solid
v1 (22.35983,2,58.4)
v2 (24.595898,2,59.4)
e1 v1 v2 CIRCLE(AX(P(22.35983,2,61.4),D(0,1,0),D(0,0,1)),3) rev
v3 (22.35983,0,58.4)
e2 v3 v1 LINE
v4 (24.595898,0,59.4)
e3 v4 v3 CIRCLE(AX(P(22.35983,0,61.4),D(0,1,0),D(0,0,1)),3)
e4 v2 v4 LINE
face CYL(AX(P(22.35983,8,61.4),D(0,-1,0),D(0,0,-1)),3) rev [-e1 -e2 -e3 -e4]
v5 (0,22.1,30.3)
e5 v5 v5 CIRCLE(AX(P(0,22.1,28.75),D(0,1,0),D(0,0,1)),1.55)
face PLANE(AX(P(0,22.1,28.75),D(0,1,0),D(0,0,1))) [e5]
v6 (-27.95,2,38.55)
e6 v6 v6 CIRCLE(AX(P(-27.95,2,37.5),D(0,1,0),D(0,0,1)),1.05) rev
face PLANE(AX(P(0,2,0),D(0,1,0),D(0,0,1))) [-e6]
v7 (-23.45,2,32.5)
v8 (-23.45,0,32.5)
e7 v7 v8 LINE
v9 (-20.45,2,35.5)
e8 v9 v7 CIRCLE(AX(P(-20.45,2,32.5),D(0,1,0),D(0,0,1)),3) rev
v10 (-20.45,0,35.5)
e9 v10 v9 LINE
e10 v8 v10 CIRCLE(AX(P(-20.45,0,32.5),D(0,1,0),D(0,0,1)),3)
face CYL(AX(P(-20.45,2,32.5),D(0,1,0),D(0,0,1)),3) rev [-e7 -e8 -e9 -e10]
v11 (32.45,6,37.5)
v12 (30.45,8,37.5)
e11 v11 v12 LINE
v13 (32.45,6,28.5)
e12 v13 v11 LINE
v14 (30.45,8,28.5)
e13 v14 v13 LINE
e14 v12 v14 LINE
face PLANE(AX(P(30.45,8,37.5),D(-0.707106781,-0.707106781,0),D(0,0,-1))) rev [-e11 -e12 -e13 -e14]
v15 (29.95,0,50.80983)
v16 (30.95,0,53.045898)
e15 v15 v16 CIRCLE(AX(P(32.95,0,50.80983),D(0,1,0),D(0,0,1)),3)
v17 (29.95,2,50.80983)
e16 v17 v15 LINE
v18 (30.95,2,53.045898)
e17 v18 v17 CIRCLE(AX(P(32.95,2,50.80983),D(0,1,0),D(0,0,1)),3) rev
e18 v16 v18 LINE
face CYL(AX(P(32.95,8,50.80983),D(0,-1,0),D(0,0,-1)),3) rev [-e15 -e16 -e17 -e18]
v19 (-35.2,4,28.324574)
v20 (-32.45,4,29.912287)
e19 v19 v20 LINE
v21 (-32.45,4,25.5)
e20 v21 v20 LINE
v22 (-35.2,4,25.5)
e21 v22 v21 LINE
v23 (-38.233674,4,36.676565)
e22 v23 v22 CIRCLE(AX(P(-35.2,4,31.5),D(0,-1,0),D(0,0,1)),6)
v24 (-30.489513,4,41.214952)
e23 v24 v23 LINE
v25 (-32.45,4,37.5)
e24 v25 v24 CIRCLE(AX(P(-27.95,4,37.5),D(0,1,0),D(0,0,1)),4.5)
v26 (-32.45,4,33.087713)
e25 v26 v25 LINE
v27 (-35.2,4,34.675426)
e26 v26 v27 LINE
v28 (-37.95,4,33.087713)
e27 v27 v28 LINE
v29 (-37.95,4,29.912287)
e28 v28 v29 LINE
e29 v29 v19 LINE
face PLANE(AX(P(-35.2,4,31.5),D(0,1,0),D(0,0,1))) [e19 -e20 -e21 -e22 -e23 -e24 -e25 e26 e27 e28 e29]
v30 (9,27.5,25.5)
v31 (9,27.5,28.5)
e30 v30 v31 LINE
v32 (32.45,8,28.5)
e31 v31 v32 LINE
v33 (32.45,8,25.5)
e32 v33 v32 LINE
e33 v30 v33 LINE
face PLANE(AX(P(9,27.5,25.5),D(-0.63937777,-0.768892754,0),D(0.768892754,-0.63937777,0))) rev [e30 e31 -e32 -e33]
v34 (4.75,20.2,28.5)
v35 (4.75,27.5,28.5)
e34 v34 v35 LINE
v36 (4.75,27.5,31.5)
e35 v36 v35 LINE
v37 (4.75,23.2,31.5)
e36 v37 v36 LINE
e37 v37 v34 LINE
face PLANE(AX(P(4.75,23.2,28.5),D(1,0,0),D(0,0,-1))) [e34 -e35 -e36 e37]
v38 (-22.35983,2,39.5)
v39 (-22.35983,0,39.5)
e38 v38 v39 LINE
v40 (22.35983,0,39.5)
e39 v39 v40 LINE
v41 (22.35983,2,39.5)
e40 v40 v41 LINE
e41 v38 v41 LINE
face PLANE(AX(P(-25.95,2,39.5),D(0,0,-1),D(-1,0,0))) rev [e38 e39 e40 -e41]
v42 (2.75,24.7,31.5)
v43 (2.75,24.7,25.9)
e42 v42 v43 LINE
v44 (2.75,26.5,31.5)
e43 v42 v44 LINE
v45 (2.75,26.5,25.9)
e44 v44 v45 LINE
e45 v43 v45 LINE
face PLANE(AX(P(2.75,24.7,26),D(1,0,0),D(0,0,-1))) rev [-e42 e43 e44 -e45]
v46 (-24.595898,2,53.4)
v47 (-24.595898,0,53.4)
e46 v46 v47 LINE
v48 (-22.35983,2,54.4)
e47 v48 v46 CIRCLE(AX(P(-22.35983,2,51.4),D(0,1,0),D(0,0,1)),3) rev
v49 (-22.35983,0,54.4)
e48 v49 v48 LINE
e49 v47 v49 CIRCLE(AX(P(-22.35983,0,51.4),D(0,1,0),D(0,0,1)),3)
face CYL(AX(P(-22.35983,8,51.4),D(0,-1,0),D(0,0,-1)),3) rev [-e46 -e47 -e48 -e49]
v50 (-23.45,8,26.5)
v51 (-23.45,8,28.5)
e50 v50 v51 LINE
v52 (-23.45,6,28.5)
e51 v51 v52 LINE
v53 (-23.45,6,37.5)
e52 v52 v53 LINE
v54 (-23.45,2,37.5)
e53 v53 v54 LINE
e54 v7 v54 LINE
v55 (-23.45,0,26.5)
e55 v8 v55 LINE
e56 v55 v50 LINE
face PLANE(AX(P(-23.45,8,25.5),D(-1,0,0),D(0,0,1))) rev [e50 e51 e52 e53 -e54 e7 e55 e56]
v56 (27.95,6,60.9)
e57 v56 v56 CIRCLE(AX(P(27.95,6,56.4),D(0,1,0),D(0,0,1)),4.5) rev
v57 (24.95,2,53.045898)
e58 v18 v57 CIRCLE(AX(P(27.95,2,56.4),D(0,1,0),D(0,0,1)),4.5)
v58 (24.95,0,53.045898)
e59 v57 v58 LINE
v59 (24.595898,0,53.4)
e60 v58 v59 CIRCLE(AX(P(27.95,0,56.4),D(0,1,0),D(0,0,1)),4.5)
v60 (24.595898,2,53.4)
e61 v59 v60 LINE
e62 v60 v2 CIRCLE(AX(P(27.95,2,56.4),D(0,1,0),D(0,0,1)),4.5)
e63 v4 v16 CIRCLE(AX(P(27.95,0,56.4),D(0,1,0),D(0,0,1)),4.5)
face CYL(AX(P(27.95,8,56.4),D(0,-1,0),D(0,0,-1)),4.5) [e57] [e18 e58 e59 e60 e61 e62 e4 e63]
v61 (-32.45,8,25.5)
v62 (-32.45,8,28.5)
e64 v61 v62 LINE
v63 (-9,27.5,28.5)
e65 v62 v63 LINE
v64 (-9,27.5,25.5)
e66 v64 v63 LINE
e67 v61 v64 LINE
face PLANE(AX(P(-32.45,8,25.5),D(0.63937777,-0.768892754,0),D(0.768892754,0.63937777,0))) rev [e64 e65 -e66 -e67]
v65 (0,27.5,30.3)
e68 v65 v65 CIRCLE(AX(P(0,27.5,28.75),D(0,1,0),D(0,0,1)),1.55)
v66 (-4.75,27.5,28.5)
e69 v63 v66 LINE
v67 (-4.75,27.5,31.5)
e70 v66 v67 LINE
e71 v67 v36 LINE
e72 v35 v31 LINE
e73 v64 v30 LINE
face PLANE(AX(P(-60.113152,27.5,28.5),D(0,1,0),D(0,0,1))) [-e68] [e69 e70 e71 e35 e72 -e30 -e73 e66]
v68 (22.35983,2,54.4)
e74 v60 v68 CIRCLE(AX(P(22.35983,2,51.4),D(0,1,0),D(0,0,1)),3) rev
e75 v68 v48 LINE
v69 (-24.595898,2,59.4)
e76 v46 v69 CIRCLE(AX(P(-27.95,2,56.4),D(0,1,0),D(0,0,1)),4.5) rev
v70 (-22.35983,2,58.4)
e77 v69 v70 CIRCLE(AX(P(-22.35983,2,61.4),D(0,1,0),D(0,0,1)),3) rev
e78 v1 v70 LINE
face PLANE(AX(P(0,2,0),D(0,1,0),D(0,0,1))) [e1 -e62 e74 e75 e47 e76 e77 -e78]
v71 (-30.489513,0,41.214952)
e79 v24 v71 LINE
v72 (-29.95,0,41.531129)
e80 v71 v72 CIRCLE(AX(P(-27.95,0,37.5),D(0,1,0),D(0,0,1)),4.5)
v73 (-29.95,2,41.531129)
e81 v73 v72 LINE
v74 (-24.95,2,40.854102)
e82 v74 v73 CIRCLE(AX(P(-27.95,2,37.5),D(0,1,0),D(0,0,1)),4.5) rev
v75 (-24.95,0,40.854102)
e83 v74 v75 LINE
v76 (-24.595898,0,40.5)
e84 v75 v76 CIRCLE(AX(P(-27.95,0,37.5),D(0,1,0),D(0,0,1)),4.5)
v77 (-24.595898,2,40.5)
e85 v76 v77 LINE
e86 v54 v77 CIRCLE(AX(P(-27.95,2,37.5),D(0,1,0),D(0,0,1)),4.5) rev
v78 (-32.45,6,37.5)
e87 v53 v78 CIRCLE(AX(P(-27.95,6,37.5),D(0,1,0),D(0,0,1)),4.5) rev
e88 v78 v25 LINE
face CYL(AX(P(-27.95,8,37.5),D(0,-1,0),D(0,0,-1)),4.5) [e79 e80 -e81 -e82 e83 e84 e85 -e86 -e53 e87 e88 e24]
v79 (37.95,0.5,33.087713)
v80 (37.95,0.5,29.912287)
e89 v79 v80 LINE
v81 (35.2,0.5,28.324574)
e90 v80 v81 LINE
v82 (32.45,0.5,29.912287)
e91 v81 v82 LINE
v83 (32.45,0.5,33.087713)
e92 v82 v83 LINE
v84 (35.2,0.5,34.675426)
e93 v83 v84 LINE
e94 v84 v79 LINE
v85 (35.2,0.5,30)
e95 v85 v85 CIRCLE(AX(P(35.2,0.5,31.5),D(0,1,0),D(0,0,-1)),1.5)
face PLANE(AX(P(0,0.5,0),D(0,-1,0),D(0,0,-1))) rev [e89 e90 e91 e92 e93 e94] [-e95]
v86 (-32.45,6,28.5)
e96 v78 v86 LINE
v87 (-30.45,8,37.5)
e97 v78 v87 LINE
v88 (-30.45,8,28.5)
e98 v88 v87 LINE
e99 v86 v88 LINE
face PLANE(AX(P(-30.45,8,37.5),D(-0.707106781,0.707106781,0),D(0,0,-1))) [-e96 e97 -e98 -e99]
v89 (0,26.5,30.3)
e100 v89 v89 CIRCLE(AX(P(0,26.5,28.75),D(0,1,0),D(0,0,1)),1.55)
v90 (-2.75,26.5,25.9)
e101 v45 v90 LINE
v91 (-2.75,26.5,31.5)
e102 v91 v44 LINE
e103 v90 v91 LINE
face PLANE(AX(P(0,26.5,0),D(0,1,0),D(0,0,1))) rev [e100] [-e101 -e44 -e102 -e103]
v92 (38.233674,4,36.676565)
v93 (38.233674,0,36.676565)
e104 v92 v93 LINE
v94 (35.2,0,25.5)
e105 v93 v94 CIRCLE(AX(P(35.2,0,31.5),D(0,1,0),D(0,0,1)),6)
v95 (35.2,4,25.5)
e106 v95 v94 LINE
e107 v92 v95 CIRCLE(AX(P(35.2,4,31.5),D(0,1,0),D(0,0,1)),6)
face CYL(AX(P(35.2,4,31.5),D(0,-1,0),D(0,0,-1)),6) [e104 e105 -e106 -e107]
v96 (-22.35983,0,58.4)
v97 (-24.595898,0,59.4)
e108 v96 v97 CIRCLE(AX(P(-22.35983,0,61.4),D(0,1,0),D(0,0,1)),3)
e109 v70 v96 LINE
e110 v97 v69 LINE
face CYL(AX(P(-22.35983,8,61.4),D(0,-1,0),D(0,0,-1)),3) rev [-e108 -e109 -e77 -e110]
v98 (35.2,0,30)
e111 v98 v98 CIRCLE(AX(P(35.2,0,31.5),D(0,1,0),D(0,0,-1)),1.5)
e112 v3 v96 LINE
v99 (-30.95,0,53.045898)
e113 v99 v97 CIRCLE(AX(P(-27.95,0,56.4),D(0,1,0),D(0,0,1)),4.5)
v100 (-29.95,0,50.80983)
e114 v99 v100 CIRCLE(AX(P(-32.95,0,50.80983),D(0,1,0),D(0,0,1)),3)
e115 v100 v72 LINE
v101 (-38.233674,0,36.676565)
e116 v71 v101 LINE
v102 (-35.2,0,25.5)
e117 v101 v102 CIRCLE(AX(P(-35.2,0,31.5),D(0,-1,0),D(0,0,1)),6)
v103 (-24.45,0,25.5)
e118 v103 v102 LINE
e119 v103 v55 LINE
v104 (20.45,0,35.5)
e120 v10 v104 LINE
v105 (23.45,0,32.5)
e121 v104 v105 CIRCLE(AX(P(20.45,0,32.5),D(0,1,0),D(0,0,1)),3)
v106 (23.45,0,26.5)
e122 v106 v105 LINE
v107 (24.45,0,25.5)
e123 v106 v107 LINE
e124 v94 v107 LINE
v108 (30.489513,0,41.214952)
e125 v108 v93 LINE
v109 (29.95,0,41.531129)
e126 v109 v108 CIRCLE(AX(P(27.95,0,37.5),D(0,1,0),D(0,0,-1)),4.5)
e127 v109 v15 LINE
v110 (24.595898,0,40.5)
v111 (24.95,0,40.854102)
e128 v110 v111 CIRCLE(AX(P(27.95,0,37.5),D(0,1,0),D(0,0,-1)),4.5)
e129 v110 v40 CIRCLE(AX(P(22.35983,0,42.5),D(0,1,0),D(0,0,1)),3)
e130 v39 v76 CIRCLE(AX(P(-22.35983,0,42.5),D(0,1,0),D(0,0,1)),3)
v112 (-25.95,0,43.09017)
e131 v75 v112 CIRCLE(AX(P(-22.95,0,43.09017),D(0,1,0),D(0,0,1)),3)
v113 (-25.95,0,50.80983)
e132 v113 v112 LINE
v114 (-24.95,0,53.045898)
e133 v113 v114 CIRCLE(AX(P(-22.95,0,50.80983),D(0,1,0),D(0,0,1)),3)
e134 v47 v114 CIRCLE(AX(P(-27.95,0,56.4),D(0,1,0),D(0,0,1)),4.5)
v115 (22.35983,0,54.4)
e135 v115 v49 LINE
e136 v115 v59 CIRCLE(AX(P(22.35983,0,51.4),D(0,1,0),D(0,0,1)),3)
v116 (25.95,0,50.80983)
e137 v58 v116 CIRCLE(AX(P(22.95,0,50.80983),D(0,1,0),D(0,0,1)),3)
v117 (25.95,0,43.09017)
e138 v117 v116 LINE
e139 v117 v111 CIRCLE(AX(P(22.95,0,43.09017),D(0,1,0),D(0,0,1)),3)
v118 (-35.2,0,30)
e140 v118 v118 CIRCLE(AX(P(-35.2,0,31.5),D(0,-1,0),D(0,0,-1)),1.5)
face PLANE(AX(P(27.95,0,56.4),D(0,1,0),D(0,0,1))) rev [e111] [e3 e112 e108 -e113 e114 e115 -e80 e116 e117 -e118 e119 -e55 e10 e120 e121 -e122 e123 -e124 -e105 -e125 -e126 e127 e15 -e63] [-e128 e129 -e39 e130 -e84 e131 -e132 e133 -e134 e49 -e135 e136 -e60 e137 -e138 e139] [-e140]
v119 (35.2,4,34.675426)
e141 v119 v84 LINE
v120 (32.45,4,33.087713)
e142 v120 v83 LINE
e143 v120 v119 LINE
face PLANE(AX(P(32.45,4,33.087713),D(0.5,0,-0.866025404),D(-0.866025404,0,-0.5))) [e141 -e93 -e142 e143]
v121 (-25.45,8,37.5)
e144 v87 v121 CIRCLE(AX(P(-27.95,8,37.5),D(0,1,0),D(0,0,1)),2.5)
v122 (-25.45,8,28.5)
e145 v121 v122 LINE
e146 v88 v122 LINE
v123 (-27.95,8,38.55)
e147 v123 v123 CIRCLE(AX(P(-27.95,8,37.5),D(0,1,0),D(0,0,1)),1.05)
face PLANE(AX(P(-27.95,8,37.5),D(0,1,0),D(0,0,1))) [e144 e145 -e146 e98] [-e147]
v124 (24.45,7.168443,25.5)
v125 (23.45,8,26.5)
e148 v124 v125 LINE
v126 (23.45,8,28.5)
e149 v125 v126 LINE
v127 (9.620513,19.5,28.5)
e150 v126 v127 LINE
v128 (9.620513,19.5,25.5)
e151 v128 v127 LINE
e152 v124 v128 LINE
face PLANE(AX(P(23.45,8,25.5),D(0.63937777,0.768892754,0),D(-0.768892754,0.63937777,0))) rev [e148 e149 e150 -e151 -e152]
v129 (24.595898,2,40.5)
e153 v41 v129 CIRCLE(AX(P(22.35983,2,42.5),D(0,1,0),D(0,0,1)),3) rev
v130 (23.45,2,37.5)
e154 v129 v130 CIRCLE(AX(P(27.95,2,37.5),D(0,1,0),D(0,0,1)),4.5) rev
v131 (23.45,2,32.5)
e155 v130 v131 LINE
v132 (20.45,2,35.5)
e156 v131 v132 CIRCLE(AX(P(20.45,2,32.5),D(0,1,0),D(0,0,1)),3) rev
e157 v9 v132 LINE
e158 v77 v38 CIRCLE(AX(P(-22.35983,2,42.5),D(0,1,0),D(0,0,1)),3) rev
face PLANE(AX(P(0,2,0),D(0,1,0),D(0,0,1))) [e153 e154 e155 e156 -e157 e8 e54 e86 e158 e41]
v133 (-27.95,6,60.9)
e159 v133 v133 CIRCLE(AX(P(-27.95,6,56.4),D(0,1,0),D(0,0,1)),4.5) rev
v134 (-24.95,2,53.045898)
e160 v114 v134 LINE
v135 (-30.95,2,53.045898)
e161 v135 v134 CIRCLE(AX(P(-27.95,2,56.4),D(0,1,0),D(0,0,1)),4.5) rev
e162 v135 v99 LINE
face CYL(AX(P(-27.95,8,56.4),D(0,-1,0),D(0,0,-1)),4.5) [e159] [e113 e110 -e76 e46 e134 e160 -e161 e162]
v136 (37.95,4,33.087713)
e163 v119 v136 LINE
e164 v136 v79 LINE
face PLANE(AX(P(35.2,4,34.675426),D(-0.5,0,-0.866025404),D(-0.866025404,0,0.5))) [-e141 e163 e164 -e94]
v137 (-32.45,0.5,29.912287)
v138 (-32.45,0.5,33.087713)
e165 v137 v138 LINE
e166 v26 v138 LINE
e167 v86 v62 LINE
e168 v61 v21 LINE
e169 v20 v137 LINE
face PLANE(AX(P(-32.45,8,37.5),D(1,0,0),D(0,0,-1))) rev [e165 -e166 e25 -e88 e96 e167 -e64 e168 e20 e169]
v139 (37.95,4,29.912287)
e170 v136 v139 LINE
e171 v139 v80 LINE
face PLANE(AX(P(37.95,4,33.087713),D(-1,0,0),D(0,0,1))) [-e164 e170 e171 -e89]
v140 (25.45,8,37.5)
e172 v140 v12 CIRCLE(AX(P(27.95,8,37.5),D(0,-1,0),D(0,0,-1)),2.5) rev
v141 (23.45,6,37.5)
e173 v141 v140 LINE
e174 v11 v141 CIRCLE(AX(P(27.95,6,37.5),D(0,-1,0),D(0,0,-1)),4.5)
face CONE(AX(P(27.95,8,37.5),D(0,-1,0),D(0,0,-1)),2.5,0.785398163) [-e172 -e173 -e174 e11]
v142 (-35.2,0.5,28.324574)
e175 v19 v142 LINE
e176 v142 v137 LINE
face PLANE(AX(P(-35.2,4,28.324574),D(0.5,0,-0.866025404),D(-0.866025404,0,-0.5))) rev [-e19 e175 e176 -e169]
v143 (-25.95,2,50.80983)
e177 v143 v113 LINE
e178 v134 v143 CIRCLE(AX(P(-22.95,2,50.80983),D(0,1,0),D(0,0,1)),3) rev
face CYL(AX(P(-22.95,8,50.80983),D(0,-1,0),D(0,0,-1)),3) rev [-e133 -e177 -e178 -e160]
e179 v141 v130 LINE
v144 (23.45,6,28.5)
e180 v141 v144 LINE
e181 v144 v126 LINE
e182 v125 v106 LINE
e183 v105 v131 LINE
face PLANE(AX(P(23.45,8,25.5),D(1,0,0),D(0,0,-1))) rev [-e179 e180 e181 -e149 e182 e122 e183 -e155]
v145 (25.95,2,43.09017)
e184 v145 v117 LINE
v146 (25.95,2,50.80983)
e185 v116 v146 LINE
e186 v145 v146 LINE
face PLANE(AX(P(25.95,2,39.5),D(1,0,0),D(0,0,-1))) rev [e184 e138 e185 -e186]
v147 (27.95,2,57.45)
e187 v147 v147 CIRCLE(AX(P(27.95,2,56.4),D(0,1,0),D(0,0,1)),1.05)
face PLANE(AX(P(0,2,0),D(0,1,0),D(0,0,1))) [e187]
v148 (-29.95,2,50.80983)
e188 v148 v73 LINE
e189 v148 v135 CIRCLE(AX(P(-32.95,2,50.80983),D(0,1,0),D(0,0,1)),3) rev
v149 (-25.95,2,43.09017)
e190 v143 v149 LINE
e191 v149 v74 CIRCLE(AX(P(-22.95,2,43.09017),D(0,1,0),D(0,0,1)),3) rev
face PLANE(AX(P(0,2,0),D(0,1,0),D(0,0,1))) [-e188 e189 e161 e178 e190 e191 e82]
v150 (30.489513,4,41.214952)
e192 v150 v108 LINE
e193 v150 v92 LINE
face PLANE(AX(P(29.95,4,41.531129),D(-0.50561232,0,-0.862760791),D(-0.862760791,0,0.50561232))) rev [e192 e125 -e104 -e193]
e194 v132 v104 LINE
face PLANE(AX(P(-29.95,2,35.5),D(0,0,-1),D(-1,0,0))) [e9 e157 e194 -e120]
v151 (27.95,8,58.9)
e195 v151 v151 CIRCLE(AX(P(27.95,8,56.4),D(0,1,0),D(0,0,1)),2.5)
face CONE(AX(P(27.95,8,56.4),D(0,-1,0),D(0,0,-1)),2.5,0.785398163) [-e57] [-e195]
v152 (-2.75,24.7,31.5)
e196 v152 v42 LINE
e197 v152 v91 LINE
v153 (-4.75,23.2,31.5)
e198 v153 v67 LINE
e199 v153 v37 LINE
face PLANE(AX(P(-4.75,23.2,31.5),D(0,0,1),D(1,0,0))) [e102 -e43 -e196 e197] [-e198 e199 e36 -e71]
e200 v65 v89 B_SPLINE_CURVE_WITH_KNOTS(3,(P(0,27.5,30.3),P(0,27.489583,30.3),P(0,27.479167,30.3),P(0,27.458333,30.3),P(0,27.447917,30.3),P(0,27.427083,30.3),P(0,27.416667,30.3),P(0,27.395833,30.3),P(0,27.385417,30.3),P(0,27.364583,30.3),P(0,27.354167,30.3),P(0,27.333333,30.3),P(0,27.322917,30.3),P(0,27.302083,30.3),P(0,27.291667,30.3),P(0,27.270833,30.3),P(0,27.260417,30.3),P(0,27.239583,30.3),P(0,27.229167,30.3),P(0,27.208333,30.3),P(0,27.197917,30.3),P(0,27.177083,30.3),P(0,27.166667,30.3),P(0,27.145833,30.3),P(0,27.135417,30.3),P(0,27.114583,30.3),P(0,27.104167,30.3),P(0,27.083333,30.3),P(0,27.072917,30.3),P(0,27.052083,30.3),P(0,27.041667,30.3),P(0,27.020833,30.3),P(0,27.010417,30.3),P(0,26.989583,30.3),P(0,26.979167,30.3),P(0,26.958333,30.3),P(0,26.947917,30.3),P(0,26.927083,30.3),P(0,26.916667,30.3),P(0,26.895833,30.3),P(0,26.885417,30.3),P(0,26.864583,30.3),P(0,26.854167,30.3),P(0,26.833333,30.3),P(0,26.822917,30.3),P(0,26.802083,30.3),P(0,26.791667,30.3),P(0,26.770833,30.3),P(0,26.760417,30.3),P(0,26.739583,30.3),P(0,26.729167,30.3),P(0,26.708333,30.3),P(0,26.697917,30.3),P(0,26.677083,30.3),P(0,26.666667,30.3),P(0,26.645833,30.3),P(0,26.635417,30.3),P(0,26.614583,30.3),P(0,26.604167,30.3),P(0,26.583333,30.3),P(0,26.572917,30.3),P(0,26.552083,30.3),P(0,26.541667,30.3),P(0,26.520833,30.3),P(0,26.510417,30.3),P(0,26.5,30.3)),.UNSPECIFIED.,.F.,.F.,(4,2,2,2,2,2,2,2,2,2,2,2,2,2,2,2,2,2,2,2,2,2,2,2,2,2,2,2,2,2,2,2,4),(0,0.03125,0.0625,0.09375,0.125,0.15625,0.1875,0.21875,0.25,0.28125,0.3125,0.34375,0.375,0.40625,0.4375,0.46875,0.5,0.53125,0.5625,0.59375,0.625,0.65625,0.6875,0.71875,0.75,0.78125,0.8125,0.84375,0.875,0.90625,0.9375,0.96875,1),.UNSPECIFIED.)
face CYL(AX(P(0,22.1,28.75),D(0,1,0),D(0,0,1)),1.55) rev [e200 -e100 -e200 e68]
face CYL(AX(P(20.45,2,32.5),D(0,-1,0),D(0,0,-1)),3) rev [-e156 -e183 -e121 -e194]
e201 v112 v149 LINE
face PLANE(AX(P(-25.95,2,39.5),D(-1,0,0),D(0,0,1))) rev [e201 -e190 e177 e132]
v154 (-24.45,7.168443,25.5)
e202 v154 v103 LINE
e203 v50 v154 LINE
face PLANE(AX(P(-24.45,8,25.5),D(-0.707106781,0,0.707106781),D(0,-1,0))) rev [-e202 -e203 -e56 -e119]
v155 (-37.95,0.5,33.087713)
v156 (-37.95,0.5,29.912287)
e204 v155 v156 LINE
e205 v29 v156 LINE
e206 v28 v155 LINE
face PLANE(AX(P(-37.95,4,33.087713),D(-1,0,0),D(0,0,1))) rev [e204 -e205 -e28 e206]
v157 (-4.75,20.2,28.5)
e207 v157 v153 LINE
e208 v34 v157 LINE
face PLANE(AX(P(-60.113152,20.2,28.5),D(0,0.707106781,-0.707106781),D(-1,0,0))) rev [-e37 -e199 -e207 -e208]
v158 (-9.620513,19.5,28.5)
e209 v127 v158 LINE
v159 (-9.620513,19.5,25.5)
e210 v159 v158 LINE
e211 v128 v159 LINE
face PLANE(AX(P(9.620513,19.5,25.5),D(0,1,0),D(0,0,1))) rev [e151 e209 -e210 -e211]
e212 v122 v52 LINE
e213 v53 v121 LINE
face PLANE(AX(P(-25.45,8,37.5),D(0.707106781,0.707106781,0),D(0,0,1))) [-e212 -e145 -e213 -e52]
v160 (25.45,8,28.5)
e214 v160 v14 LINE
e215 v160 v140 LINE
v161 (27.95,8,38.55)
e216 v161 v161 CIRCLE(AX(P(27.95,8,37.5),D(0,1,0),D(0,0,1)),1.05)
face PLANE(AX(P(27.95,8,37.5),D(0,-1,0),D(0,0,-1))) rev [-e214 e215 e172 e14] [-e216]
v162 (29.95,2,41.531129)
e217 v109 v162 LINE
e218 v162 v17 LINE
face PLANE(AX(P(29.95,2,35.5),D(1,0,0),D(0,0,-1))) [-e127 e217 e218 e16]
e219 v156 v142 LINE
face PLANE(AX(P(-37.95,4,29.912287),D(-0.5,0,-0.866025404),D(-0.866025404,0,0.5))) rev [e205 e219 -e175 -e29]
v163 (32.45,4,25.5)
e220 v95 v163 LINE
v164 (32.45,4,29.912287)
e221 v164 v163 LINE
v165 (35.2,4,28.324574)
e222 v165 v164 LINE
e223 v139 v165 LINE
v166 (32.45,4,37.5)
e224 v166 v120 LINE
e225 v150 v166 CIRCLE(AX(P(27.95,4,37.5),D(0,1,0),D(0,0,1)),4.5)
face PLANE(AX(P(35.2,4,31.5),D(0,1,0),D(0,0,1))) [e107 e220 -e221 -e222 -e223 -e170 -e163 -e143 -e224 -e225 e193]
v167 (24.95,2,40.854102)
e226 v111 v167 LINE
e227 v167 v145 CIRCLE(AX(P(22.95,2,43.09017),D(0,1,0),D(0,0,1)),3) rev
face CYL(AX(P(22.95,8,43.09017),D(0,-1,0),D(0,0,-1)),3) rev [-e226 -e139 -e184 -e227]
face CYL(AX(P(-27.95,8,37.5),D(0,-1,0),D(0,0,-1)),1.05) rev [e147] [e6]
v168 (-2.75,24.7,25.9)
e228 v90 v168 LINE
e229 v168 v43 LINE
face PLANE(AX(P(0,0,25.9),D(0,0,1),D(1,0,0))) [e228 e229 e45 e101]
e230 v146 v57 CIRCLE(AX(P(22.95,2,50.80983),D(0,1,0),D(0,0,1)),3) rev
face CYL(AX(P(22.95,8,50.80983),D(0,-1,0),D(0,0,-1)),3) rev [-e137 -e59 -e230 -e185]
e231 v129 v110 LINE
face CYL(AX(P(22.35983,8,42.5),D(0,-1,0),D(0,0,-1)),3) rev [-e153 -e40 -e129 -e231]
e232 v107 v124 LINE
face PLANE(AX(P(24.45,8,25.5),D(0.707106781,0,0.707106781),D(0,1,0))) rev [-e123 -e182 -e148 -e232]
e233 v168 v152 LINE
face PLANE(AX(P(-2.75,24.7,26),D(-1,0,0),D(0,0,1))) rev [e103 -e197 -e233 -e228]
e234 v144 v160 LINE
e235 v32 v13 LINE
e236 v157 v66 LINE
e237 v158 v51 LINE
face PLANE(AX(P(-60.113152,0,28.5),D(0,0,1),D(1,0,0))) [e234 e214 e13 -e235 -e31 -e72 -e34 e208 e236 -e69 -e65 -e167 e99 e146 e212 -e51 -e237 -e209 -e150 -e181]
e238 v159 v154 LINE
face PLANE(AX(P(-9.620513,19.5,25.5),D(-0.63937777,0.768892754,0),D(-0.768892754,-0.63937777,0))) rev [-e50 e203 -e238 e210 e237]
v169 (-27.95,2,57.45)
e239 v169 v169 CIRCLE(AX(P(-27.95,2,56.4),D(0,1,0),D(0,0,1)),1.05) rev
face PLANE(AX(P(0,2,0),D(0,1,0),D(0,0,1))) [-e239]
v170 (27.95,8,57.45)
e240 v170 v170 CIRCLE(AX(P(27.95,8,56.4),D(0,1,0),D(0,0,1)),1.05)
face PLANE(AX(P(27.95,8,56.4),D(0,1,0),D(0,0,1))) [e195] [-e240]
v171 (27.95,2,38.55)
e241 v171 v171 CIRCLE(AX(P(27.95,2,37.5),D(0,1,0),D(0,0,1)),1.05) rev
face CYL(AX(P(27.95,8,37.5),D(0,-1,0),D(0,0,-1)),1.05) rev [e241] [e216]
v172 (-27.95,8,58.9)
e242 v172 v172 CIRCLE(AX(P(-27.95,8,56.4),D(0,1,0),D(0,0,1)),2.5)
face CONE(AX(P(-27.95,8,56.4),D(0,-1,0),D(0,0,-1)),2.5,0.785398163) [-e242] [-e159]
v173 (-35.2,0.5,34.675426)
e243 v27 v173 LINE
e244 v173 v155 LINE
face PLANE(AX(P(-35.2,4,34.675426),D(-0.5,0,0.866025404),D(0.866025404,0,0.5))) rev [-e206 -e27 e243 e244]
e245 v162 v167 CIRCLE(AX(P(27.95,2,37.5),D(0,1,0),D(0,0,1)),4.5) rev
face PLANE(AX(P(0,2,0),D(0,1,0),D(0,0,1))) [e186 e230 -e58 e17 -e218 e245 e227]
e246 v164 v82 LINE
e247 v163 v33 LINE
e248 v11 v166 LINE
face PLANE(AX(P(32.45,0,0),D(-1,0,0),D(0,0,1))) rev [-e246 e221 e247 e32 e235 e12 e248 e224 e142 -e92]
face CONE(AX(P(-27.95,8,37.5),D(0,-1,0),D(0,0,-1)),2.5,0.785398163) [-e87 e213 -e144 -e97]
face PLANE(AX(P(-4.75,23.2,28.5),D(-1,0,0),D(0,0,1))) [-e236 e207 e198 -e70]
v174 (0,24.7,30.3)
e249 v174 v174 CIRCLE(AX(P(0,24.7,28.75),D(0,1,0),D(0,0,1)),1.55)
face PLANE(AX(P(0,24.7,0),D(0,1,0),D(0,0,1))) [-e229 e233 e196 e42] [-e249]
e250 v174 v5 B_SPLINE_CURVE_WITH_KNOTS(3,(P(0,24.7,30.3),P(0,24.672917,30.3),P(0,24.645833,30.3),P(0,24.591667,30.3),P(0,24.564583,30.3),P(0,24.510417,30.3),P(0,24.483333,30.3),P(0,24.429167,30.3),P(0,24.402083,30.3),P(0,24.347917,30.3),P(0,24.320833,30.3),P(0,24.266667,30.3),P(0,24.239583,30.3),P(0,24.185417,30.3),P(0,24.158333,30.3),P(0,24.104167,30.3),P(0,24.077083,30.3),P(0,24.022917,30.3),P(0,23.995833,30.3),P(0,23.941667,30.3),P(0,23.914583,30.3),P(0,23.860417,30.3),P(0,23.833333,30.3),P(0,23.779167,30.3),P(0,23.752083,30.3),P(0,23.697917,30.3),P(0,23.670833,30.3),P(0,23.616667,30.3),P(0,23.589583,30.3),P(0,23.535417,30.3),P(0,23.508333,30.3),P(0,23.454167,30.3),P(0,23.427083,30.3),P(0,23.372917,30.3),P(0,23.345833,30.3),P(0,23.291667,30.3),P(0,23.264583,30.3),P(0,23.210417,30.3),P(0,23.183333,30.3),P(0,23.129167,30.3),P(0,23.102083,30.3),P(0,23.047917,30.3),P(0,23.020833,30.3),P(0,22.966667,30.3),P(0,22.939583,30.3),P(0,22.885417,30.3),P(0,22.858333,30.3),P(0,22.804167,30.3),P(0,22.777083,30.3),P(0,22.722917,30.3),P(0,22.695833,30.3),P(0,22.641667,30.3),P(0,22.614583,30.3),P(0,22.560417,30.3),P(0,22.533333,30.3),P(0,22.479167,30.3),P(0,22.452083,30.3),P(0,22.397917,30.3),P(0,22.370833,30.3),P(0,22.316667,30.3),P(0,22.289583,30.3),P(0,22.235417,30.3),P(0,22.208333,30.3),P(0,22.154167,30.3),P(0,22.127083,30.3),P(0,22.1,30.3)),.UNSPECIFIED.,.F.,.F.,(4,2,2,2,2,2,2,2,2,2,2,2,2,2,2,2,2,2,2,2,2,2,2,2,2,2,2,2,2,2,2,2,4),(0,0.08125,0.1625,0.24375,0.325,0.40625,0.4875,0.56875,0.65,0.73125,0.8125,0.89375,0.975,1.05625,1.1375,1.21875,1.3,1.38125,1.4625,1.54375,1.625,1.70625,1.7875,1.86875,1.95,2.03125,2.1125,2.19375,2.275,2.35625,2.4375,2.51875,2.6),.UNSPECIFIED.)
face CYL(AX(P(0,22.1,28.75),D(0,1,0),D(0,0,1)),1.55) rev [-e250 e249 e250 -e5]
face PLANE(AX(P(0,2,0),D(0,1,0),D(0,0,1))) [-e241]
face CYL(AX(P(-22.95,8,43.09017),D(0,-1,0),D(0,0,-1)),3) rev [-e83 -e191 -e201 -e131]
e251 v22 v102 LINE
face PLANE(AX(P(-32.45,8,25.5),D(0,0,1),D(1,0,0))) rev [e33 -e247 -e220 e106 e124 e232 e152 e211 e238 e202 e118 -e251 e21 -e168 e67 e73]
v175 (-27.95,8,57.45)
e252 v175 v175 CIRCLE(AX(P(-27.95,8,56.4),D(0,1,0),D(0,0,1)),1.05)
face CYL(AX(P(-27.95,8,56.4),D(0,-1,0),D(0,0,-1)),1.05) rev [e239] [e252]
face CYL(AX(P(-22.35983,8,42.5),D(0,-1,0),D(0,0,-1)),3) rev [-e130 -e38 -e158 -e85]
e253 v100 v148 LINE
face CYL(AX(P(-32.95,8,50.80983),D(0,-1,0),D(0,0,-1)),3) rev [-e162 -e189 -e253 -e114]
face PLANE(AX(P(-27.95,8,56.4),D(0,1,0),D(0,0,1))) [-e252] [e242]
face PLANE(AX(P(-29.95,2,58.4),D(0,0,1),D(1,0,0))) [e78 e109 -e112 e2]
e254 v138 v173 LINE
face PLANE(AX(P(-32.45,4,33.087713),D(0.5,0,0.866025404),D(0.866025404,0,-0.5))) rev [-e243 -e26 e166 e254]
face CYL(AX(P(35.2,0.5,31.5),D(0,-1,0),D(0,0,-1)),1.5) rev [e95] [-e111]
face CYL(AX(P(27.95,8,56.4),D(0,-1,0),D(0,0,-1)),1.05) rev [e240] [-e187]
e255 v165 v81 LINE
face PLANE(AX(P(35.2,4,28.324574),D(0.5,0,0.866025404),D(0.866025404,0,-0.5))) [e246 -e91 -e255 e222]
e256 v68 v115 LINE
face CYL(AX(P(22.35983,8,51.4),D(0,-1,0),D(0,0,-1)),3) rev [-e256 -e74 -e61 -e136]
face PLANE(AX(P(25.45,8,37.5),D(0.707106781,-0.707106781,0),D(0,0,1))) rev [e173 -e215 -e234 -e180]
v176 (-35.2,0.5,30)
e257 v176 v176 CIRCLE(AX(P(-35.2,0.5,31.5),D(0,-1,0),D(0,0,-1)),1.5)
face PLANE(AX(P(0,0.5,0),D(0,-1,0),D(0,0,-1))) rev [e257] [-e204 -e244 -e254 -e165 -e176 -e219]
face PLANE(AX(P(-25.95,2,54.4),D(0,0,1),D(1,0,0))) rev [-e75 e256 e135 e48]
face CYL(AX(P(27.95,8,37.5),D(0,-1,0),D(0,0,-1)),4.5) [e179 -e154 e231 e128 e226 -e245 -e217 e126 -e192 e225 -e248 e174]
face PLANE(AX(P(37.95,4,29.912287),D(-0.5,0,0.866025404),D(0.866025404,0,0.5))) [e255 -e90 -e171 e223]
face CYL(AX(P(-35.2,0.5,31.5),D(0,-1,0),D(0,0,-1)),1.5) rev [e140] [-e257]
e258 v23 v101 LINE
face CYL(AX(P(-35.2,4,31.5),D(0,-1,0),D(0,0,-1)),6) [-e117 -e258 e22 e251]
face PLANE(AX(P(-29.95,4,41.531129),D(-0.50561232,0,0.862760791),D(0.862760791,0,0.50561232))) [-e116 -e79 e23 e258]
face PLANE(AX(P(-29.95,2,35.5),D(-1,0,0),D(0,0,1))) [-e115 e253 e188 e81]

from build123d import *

# Parameters (mm, degrees)
SKETCH1_R             = 4.5
SKETCH1_R_2           = 1.05
BOSS_EXTRUDE1_DEPTH   = 8
BOSS_EXTRUDE1_2_DEPTH = 8
BOSS_EXTRUDE1_3_DEPTH = 8
BOSS_EXTRUDE1_4_DEPTH = 8
BOSS_EXTRUDE2_REACH   = 91.358
SKETCH2_W             = 3
SKETCH2_H             = 27.5
CUT_EXTRUDE1_DEPTH    = 54.46973443
SKETCH4_W             = 59.9
SKETCH4_H             = 22.9
SKETCH4_W_2           = 51.9
SKETCH4_H_2           = 14.9
BOSS_EXTRUDE3_DEPTH   = 2
SKETCH7_W             = 9.5
SKETCH7_H             = 3
BOSS_EXTRUDE5_DEPTH   = 4.3
CUT_EXTRUDE3_START    = -1
SKETCH8_W             = 5.5
SKETCH8_H             = 5.5
CUT_EXTRUDE3_DEPTH    = 1.8
CHAMFER3_SIZE         = 3
SKETCH9_R             = 1.55
CUT_EXTRUDE4_DEPTH    = 5.4
BOSS_EXTRUDE6_DEPTH   = 4
SKETCH11_R            = 1.5
BOSS_EXTRUDE7_DEPTH   = 0.5
FILLET2_R             = 3
CHAMFER4_SIZE         = 1
CHAMFER5_SIZE         = 2
SKETCH12_W            = 5.5
SKETCH12_H            = 1.8
CUT_EXTRUDE5_DEPTH    = 0.1


with BuildPart() as part:
    # Sketch1 → Boss-Extrude1 (new body)
    with BuildSketch(Plane(origin=(0, 0, 0), x_dir=(1, 0, 0), z_dir=(0, 1, 0))):
        with Locations(Location((27.95, -56.4, 0), (0, 0, 270))):
            Circle(SKETCH1_R)
        with Locations(Location((27.95, -56.4, 0), (0, 0, 270))):
            Circle(SKETCH1_R_2, mode=Mode.SUBTRACT)
    extrude(amount=BOSS_EXTRUDE1_DEPTH)



with BuildPart() as body_2:
    # Sketch1 → Boss-Extrude1 2 (new body)
    with BuildSketch(Plane(origin=(0, 0, 0), x_dir=(1, 0, 0), z_dir=(0, 1, 0))):
        with Locations(Location((-27.95, -56.4, 0), (0, 0, 270))):
            Circle(SKETCH1_R)
        with Locations(Location((-27.95, -56.4, 0), (0, 0, 270))):
            Circle(SKETCH1_R_2, mode=Mode.SUBTRACT)
    extrude(amount=BOSS_EXTRUDE1_2_DEPTH)


with BuildPart() as body_3:
    # Sketch1 → Boss-Extrude1 3 (new body)
    with BuildSketch(Plane(origin=(0, 0, 0), x_dir=(1, 0, 0), z_dir=(0, 1, 0))):
        with BuildLine():
            Line((-32.45, -37.5), (-32.45, -25.5))
            Line((-32.45, -25.5), (-23.45, -25.5))
            Line((-23.45, -25.5), (-23.45, -37.5))
            ThreePointArc((-23.45, -37.5), (-27.95, -42), (-32.45, -37.5))
        make_face()
        with Locations(Location((-27.95, -37.5, 0), (0, 0, 270))):
            Circle(SKETCH1_R_2, mode=Mode.SUBTRACT)
    extrude(amount=BOSS_EXTRUDE1_3_DEPTH)

    # Boss-Extrude2: up to this face of the body (flat: up to its plane)
    boss_extrude2_end = Plane(body_3.part.faces().sort_by_distance((-32.45, 4, 31.5))[0])
    # Sketch2 → Boss-Extrude2 (add, up to the picked face)
    with BuildSketch(Plane(origin=(32.45, 0, 0), x_dir=(0, 0, -1), z_dir=(1, 0, 0)), mode=Mode.PRIVATE) as boss_extrude2_sk1:
        with Locations((-27, 13.75)):
            Rectangle(SKETCH2_W, SKETCH2_H)
    boss_extrude2_tool1 = split(extrude(boss_extrude2_sk1.sketch, amount=-BOSS_EXTRUDE2_REACH, mode=Mode.PRIVATE), bisect_by=boss_extrude2_end, keep=Keep.BOTH, mode=Mode.PRIVATE)


with BuildPart() as body_4:
    # Sketch1 → Boss-Extrude1 4 (new body)
    with BuildSketch(Plane(origin=(0, 0, 0), x_dir=(1, 0, 0), z_dir=(0, 1, 0))):
        with BuildLine():
            Line((32.45, -37.5), (32.45, -25.5))
            Line((32.45, -25.5), (23.45, -25.5))
            Line((23.45, -25.5), (23.45, -37.5))
            ThreePointArc((23.45, -37.5), (27.95, -42), (32.45, -37.5))
        make_face()
        with Locations(Location((27.95, -37.5, 0), (0, 0, 270))):
            Circle(SKETCH1_R_2, mode=Mode.SUBTRACT)
    extrude(amount=BOSS_EXTRUDE1_4_DEPTH)


with BuildPart() as body_3_1:
    add(body_3.part)

    add(body_4.part)  # Boss-Extrude2 merges body 4
    add(boss_extrude2_tool1.solids().sort_by(Axis((32.45, 13.75, 27), (-1, 0, 0)))[0])

    # Sketch3 → Cut-Extrude1 (cut, through all)
    with BuildSketch(Plane.XY.offset(28.5)):
        Polygon((-32.45, 8), (-9, 27.5), (-32.45, 27.5), align=None)
        Polygon((9, 27.5), (32.45, 8), (32.45, 27.5), align=None)
        Polygon((-23.45, 8), (-23.45, 0), (23.45, 0), (23.45, 8), (9.620512821, 19.5), (-9.620512821, 19.5), align=None)
    extrude(amount=-CUT_EXTRUDE1_DEPTH, mode=Mode.SUBTRACT)


with BuildPart() as part_1:
    add(part.part)

    add(body_2.part)  # Boss-Extrude3 merges body 2

    add(body_3_1.part)  # Boss-Extrude3 merges body 3
    # Sketch4 → Boss-Extrude3 (add)
    with BuildSketch(Plane.XZ):
        with Locations((0, 46.95)):
            Rectangle(SKETCH4_W, SKETCH4_H)
        with Locations((0, 46.95)):
            Rectangle(SKETCH4_W_2, SKETCH4_H_2, mode=Mode.SUBTRACT)
    extrude(amount=-BOSS_EXTRUDE3_DEPTH)

    # Sketch7 → Boss-Extrude5 (add)
    with BuildSketch(Plane(origin=(0, 27.5, 0), x_dir=(1, 0, 0), z_dir=(0, 1, 0))):
        with Locations((0, -30)):
            Rectangle(SKETCH7_W, SKETCH7_H)
    extrude(amount=-BOSS_EXTRUDE5_DEPTH)

    # Sketch8 → Cut-Extrude3 (cut)
    with BuildSketch(Plane(origin=(0, 27.5, 0), x_dir=(1, 0, 0), z_dir=(0, 1, 0)).offset(CUT_EXTRUDE3_START)):
        with Locations((0, -28.75)):
            Rectangle(SKETCH8_W, SKETCH8_H)
    extrude(amount=-CUT_EXTRUDE3_DEPTH, mode=Mode.SUBTRACT)

    # Chamfer3
    chamfer3_edges = [part_1.edges().sort_by_distance(p)[0] for p in [
        (0, 23.2, 28.5),
    ]]
    chamfer(chamfer3_edges, length=CHAMFER3_SIZE - 0.0001)  # a hair under: the kernel refuses the full size

    # Sketch9 → Cut-Extrude4 (cut)
    with BuildSketch(Plane(origin=(0, 27.5, 0), x_dir=(1, 0, 0), z_dir=(0, 1, 0))):
        with Locations(Location((0, -28.75, 0), (0, 0, 270))):
            Circle(SKETCH9_R)
    extrude(amount=-CUT_EXTRUDE4_DEPTH, mode=Mode.SUBTRACT)

    # Sketch10 → Boss-Extrude6 (add)
    with BuildSketch(Plane.XZ):
        with BuildLine():
            Line((-32.45, 25.5), (-35.2, 25.5))
            ThreePointArc((-35.2, 25.5), (-40.990483074, 29.928279361), (-38.233673919, 36.676564744))
            Line((-38.233673919, 36.676564744), (-29.95, 41.531128874))
            Line((-29.95, 41.531128874), (-29.95, 25.5))
            Line((-29.95, 25.5), (-32.45, 25.5))
        make_face()
        Polygon((-35.2, 28.324573519), (-32.45, 29.91228676), (-32.45, 33.08771324), (-35.2, 34.675426481), (-37.95, 33.08771324), (-37.95, 29.91228676), align=None, mode=Mode.SUBTRACT)
    boss_extrude6 = extrude(amount=-BOSS_EXTRUDE6_DEPTH)

    # Sketch11 → Boss-Extrude7 (add)
    with BuildSketch(Plane.XZ):
        Polygon((-37.95, 33.08771324), (-37.95, 29.91228676), (-35.2, 28.324573519), (-32.45, 29.91228676), (-32.45, 33.08771324), (-35.2, 34.675426481), align=None)
        with Locations(Location((-35.2, 31.5, 0), (0, 0, 270))):
            Circle(SKETCH11_R, mode=Mode.SUBTRACT)
    boss_extrude7 = extrude(amount=-BOSS_EXTRUDE7_DEPTH)

    # Mirror1: Boss-Extrude6, Boss-Extrude7 across plane
    add(boss_extrude6.mirror(Plane(origin=(0, 0, 0), x_dir=(0, 0, 1), z_dir=(1, 0, 0))))
    add(boss_extrude7.mirror(Plane(origin=(0, 0, 0), x_dir=(0, 0, 1), z_dir=(1, 0, 0))))

    # Fillet2
    fillet2_edges = [part_1.edges().sort_by_distance(p)[0] for p in [
        (23.918871126, 1, 58.4),
        (-25.95, 1, 52.368871126),
        (-23.918871126, 1, 58.4),
        (-29.95, 1, 52.368871126),
        (-23.918871126, 1, 54.4),
        (23.918871126, 1, 39.5),
        (-23.918871126, 1, 39.5),
        (23.45, 1, 35.5),
        (-23.45, 1, 35.5),
        (25.95, 1, 52.368871126),
        (-25.95, 1, 41.531128874),
        (29.95, 1, 52.368871126),
        (25.95, 1, 41.531128874),
        (23.918871126, 1, 54.4),
    ]]
    fillet(fillet2_edges, radius=FILLET2_R)

    # Chamfer4
    chamfer4_edges = [part_1.edges().sort_by_distance(p)[0] for p in [
        (23.45, 4, 25.5),
        (-23.45, 4, 25.5),
    ]]
    chamfer(chamfer4_edges, length=CHAMFER4_SIZE)

    # Chamfer5
    chamfer5_edges = [part_1.edges().sort_by_distance(p)[0] for p in [
        (27.95, 8, 51.9),
        (-27.95, 8, 51.9),
        (-32.45, 8, 33),
        (-27.95, 8, 42),
        (-23.45, 8, 33),
        (23.45, 8, 33),
        (27.95, 8, 42),
        (32.45, 8, 33),
    ]]
    chamfer(chamfer5_edges, length=CHAMFER5_SIZE)

    # Sketch12 → Cut-Extrude5 (cut)
    with BuildSketch(Plane.XY.offset(26)):
        with Locations((0, 25.6)):
            Rectangle(SKETCH12_W, SKETCH12_H)
    extrude(amount=-CUT_EXTRUDE5_DEPTH, mode=Mode.SUBTRACT)


solid = part_1.part
